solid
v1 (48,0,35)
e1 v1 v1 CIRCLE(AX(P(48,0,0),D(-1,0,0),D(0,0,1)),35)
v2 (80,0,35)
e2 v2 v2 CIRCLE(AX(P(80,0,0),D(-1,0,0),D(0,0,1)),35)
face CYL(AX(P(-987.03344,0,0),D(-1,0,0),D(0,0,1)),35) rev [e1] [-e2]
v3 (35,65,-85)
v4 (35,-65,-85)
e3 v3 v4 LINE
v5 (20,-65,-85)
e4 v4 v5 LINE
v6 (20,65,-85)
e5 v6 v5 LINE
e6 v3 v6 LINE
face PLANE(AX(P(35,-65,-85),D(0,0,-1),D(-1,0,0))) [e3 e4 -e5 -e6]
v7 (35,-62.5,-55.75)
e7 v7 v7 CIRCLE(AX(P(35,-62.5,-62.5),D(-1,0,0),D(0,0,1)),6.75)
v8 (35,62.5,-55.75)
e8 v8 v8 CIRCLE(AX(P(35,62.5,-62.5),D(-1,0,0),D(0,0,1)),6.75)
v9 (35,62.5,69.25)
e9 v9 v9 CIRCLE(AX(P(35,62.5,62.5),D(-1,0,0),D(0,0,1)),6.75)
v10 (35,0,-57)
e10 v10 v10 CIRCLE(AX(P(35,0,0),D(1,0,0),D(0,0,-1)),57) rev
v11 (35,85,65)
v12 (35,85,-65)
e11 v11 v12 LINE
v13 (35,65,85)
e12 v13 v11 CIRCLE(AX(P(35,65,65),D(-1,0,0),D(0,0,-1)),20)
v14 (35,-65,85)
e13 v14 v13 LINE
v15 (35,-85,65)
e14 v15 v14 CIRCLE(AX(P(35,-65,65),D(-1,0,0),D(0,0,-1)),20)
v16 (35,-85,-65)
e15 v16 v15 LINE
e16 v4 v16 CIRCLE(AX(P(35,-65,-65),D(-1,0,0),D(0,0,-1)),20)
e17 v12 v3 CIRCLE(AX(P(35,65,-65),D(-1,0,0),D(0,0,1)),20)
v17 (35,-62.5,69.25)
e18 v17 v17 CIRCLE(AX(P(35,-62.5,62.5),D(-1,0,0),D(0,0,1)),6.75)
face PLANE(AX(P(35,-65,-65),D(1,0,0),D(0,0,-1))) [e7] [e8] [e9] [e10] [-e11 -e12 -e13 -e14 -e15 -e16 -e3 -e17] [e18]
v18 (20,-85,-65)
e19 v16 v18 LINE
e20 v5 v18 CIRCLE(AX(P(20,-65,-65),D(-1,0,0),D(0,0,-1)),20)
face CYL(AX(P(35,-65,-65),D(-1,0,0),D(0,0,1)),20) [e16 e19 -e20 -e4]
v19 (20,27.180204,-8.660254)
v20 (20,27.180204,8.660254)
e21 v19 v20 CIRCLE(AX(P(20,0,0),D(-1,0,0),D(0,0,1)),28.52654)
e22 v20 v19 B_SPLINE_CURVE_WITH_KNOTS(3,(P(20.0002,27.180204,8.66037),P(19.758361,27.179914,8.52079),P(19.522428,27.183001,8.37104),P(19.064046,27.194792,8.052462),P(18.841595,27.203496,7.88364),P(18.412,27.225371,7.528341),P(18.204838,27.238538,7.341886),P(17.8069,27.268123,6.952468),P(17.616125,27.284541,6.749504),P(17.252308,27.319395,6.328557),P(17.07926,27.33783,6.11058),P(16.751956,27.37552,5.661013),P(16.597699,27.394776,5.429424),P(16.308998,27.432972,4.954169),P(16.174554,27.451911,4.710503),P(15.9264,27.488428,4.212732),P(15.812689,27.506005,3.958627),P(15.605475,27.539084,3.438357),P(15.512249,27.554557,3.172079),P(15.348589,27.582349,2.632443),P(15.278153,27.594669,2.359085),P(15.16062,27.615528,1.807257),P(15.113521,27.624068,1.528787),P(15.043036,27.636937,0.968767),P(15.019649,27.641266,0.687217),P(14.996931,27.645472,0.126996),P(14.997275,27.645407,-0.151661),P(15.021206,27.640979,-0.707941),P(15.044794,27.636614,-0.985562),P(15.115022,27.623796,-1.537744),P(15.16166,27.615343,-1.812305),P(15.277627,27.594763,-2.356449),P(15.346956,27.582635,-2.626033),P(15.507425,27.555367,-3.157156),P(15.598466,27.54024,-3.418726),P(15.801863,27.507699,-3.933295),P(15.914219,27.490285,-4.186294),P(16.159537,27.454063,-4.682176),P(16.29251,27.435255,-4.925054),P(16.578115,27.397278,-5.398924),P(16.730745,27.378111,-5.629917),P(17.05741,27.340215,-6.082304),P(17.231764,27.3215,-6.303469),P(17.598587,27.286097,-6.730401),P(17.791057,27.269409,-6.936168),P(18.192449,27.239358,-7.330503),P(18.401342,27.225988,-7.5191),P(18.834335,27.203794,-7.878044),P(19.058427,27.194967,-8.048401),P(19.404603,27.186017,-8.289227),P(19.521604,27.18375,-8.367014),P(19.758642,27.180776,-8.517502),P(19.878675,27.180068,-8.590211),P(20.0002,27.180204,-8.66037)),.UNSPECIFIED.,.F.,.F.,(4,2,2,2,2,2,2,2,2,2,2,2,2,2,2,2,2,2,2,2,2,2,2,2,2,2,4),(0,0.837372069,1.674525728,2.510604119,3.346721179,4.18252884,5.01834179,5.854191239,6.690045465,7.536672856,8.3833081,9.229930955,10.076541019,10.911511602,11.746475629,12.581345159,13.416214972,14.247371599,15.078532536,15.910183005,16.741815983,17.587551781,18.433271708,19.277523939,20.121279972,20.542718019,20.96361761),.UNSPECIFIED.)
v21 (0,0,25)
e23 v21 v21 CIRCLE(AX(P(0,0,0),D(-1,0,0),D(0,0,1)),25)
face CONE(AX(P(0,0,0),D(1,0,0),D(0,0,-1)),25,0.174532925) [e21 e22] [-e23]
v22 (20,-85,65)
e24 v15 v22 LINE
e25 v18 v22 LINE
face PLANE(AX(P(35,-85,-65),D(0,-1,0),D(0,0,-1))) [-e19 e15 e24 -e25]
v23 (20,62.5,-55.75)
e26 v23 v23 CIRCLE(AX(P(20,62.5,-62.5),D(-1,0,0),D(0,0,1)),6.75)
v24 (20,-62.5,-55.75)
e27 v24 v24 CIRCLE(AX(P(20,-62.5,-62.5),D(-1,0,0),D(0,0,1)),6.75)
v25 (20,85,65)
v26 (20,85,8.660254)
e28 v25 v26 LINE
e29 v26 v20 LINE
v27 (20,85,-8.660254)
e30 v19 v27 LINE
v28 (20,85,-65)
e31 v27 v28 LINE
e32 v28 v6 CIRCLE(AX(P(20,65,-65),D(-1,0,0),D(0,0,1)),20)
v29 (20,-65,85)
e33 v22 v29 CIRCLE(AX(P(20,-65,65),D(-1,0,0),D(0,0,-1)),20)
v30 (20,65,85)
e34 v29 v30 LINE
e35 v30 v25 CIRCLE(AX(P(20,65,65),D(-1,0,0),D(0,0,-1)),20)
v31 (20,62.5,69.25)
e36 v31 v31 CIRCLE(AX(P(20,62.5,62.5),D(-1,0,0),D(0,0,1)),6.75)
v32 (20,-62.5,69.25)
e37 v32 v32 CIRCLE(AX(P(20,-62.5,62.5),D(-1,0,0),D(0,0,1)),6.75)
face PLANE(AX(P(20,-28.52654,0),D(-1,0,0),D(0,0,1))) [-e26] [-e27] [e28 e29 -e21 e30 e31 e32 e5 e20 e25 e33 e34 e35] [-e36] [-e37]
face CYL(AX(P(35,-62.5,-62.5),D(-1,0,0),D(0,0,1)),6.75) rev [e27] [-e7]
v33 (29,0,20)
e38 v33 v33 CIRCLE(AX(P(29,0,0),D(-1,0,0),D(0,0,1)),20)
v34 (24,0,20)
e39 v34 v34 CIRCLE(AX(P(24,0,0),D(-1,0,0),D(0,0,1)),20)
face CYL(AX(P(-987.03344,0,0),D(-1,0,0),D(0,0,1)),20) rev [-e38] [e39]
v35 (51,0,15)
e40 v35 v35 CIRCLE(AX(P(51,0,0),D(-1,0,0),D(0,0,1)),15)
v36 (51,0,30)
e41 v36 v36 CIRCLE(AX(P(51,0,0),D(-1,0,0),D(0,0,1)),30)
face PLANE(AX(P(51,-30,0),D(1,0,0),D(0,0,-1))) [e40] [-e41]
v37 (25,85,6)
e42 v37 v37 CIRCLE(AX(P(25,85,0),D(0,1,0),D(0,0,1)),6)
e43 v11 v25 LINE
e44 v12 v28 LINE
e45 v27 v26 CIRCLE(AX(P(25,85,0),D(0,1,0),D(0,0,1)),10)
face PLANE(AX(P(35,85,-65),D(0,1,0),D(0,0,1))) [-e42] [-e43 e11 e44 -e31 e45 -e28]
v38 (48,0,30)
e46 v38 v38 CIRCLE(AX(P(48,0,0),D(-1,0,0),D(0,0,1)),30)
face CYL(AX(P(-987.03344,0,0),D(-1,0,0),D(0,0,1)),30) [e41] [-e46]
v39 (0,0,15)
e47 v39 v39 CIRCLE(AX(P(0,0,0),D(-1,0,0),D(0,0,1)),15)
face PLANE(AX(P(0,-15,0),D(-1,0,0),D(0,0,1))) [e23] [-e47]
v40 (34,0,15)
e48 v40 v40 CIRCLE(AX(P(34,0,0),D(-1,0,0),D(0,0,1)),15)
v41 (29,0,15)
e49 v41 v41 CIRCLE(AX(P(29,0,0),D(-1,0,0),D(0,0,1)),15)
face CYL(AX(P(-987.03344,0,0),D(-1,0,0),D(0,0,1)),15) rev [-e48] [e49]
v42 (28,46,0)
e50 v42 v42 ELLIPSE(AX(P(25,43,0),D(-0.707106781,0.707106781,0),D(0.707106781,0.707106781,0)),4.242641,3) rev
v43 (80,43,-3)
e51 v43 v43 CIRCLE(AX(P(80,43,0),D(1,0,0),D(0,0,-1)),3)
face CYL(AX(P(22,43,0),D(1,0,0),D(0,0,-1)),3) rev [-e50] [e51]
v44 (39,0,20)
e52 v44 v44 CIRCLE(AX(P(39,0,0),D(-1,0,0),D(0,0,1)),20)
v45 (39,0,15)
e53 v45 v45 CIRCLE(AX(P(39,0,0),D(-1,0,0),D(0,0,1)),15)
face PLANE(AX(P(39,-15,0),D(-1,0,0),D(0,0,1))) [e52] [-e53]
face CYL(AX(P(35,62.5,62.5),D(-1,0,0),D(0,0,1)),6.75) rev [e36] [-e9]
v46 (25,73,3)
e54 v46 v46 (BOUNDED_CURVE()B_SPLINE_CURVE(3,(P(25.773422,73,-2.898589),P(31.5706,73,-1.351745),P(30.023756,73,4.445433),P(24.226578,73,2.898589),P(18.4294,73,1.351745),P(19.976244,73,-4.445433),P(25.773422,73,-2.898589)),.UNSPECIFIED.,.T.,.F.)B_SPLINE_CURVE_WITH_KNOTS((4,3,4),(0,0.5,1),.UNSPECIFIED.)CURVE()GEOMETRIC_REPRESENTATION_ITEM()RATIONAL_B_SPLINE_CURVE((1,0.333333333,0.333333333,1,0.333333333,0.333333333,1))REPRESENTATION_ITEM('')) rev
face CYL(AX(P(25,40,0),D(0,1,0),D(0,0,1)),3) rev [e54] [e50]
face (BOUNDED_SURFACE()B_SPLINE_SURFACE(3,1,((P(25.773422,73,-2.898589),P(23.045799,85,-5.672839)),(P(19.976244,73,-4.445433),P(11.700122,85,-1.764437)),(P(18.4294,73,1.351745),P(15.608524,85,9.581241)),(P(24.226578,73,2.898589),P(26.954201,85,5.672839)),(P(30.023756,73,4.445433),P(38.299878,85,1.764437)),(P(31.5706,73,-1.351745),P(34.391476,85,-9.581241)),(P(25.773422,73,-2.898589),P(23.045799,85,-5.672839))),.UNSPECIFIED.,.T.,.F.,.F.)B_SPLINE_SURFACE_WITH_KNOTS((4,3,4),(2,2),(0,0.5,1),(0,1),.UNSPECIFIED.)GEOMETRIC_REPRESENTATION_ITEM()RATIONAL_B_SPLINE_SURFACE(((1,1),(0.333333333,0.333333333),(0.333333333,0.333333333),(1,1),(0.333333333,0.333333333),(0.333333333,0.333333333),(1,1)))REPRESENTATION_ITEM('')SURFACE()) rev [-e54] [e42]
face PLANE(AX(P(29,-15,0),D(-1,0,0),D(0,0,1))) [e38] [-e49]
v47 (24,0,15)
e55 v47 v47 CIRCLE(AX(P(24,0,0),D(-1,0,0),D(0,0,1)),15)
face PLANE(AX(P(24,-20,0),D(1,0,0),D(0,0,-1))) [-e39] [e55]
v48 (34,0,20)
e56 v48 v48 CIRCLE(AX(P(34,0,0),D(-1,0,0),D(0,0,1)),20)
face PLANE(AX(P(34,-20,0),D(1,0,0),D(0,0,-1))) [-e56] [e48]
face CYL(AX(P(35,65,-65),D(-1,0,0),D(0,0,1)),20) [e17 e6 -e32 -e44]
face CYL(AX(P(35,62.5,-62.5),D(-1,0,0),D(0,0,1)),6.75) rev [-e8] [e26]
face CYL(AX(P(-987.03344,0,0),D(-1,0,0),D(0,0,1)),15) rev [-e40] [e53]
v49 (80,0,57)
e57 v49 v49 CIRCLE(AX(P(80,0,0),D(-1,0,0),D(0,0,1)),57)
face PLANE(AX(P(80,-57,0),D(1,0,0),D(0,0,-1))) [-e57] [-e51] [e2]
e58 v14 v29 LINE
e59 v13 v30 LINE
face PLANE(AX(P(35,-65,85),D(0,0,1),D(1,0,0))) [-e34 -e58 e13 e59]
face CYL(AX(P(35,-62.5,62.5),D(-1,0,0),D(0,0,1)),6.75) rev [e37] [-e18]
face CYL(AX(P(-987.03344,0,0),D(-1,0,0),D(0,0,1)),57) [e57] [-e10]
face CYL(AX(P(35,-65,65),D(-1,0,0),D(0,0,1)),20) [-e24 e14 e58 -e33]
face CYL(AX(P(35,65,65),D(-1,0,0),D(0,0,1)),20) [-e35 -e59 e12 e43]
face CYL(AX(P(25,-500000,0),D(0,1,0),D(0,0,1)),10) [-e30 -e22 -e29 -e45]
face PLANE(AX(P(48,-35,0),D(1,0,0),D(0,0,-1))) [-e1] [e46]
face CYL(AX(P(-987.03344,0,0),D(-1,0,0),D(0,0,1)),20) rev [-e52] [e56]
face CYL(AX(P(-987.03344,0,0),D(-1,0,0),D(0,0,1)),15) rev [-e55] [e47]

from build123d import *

# Parameters (mm, degrees)
SKETCH_2_R          = 6.75
SKETCH_2_R_2        = 20
EXTRUDE_1_DEPTH     = 15
EXTRUDE_2_REACH     = 208.216
SKETCH_3_R          = 10
SKETCH_6_R          = 3
CUT_EXTRUDE_1_DEPTH = 33
SKETCH_8_R          = 3
CUT_EXTRUDE_2_DEPTH = 58
EXTRUDE_START       = 6
EXTRUDE_3_DEPTH     = 6
EXTRUDE_4_DEPTH     = 58


with BuildPart() as part:
    # Эскиз1 → Повернуть1 (revolve)
    with BuildSketch(Plane.XY, mode=Mode.PRIVATE) as revolve_1_sk:
        Polygon((0, -15), (0, -25), (20, -28.526539614), (20, -57), (80, -57), (80, -35), (48, -35), (48, -30), (51, -30), (51, -15), (39, -15), (39, -20), (34, -20), (34, -15), (29, -15), (29, -20), (24, -20), (24, -15), align=None)
    revolve(revolve_1_sk.sketch.rotate(Axis((-987.033440026, 0, 0), (1, 0, 0)), 270), axis=Axis((-987.033440026, 0, 0), (1, 0, 0)))

    # Эскиз2 → Бобышка-Вытянуть1 (add)
    with BuildSketch(Plane.ZY.offset(-20)):
        with BuildLine():
            Line((-65, -85), (65, -85))
            ThreePointArc((65, -85), (79.142135624, -79.142135624), (85, -65))
            Line((85, -65), (85, 65))
            ThreePointArc((85, 65), (79.142135624, 79.142135624), (65, 85))
            Line((65, 85), (-65, 85))
            ThreePointArc((-65, 85), (-79.142135624, 79.142135624), (-85, 65))
            Line((-85, 65), (-85, -65))
            ThreePointArc((-85, -65), (-79.142135624, -79.142135624), (-65, -85))
        make_face()
        with Locations((-62.5, -62.5)):
            Circle(SKETCH_2_R, mode=Mode.SUBTRACT)
        with Locations((-62.5, 62.5)):
            Circle(SKETCH_2_R, mode=Mode.SUBTRACT)
        with Locations((62.5, 62.5)):
            Circle(SKETCH_2_R, mode=Mode.SUBTRACT)
        with Locations((62.5, -62.5)):
            Circle(SKETCH_2_R, mode=Mode.SUBTRACT)
        Circle(SKETCH_2_R_2, mode=Mode.SUBTRACT)
    extrude(amount=-EXTRUDE_1_DEPTH)

    # Эскиз3 → Бобышка-Вытянуть2 (add, up to next)
    with BuildSketch(Plane(origin=(0, 85, 0), x_dir=(1, 0, 0), z_dir=(0, 1, 0)), mode=Mode.PRIVATE) as extrude_2_sk1:
        with Locations((25, 0)):
            Circle(SKETCH_3_R)
    extrude_2_tool1 = extrude(extrude_2_sk1.sketch, amount=-EXTRUDE_2_REACH, mode=Mode.PRIVATE) - part.part
    add(extrude_2_tool1.solids().sort_by_distance((25, 85, 0))[0])

    # Вырез-По сечениям1: read off the stored shape, not the designer's step
    # Вырез-По сечениям1: loft between two sections, ruled curve by curve
    loft_1_from = [
        Edge.make_bspline([(25.773422165, 73, -2.898588994), (19.976244177, 73, -4.445433323), (18.429399848, 73, 1.351744665), (24.226577835, 73, 2.898588994), (30.023755823, 73, 4.445433323), (31.570600152, 73, -1.351744665), (25.773422165, 73, -2.898588994)], [0, 0, 0, 0, 0.5, 0.5, 0.5, 1, 1, 1, 1], 3, [1, 0.333333333, 0.333333333, 1, 0.333333333, 0.333333333, 1]),
    ]
    loft_1_to = [
        Edge.make_bspline([(23.045798977, 85, -5.672838651), (11.700121675, 85, -1.764436604), (15.608523722, 85, 9.581240698), (26.954201023, 85, 5.672838651), (38.299878325, 85, 1.764436604), (34.391476278, 85, -9.581240698), (23.045798977, 85, -5.672838651)], [0, 0, 0, 0, 0.5, 0.5, 0.5, 1, 1, 1, 1], 3, [1, 0.333333333, 0.333333333, 1, 0.333333333, 0.333333333, 1]),
    ]
    loft_1 = Solid(Shell([*[Face.make_surface_from_curves(loft_1_from[k], loft_1_to[k]) for k in range(1)], Face(Wire(loft_1_from)), Face(Wire(loft_1_to))]))
    add(loft_1, mode=Mode.SUBTRACT)

    # Эскиз6 → Вырез-Вытянуть1 (cut)
    with BuildSketch(Plane(origin=(0, 73, 0), x_dir=(1, 0, 0), z_dir=(0, 1, 0))):
        with Locations(Location((25, 0, 0), (0, 0, 270))):
            Circle(SKETCH_6_R)
    extrude(amount=-CUT_EXTRUDE_1_DEPTH, mode=Mode.SUBTRACT)

    # Эскиз8 → Вырез-Вытянуть2 (cut)
    with BuildSketch(Plane(origin=(80, 0, 0), x_dir=(0, 0, -1), z_dir=(1, 0, 0))):
        with Locations((0, 43)):
            Circle(SKETCH_8_R)
    extrude(amount=-CUT_EXTRUDE_2_DEPTH, mode=Mode.SUBTRACT)

    # Эскиз10 → Бобышка-Вытянуть3 (add)
    with BuildSketch(Plane(origin=(0, 40, 0), x_dir=(1, 0, 0), z_dir=(0, 1, 0)).offset(EXTRUDE_START)):
        with BuildLine():
            Line((25, 3), (25, 4.5))
            ThreePointArc((25, 4.5), (20.5, 0), (25, -4.5))
            Line((25, -4.5), (25, -3))
            ThreePointArc((25, -3), (22, 0), (25, 3))
        make_face()
    extrude(amount=-EXTRUDE_3_DEPTH)

    # Эскиз11 → Бобышка-Вытянуть4 (add)
    with BuildSketch(Plane(origin=(80, 0, 0), x_dir=(0, 0, -1), z_dir=(1, 0, 0))):
        with BuildLine():
            Line((3, 43), (4.5, 43))
            ThreePointArc((4.5, 43), (0, 38.5), (-4.5, 43))
            Line((-4.5, 43), (-3, 43))
            ThreePointArc((-3, 43), (0, 40), (3, 43))
        make_face()
    extrude(amount=-EXTRUDE_4_DEPTH)


solid = part.part
